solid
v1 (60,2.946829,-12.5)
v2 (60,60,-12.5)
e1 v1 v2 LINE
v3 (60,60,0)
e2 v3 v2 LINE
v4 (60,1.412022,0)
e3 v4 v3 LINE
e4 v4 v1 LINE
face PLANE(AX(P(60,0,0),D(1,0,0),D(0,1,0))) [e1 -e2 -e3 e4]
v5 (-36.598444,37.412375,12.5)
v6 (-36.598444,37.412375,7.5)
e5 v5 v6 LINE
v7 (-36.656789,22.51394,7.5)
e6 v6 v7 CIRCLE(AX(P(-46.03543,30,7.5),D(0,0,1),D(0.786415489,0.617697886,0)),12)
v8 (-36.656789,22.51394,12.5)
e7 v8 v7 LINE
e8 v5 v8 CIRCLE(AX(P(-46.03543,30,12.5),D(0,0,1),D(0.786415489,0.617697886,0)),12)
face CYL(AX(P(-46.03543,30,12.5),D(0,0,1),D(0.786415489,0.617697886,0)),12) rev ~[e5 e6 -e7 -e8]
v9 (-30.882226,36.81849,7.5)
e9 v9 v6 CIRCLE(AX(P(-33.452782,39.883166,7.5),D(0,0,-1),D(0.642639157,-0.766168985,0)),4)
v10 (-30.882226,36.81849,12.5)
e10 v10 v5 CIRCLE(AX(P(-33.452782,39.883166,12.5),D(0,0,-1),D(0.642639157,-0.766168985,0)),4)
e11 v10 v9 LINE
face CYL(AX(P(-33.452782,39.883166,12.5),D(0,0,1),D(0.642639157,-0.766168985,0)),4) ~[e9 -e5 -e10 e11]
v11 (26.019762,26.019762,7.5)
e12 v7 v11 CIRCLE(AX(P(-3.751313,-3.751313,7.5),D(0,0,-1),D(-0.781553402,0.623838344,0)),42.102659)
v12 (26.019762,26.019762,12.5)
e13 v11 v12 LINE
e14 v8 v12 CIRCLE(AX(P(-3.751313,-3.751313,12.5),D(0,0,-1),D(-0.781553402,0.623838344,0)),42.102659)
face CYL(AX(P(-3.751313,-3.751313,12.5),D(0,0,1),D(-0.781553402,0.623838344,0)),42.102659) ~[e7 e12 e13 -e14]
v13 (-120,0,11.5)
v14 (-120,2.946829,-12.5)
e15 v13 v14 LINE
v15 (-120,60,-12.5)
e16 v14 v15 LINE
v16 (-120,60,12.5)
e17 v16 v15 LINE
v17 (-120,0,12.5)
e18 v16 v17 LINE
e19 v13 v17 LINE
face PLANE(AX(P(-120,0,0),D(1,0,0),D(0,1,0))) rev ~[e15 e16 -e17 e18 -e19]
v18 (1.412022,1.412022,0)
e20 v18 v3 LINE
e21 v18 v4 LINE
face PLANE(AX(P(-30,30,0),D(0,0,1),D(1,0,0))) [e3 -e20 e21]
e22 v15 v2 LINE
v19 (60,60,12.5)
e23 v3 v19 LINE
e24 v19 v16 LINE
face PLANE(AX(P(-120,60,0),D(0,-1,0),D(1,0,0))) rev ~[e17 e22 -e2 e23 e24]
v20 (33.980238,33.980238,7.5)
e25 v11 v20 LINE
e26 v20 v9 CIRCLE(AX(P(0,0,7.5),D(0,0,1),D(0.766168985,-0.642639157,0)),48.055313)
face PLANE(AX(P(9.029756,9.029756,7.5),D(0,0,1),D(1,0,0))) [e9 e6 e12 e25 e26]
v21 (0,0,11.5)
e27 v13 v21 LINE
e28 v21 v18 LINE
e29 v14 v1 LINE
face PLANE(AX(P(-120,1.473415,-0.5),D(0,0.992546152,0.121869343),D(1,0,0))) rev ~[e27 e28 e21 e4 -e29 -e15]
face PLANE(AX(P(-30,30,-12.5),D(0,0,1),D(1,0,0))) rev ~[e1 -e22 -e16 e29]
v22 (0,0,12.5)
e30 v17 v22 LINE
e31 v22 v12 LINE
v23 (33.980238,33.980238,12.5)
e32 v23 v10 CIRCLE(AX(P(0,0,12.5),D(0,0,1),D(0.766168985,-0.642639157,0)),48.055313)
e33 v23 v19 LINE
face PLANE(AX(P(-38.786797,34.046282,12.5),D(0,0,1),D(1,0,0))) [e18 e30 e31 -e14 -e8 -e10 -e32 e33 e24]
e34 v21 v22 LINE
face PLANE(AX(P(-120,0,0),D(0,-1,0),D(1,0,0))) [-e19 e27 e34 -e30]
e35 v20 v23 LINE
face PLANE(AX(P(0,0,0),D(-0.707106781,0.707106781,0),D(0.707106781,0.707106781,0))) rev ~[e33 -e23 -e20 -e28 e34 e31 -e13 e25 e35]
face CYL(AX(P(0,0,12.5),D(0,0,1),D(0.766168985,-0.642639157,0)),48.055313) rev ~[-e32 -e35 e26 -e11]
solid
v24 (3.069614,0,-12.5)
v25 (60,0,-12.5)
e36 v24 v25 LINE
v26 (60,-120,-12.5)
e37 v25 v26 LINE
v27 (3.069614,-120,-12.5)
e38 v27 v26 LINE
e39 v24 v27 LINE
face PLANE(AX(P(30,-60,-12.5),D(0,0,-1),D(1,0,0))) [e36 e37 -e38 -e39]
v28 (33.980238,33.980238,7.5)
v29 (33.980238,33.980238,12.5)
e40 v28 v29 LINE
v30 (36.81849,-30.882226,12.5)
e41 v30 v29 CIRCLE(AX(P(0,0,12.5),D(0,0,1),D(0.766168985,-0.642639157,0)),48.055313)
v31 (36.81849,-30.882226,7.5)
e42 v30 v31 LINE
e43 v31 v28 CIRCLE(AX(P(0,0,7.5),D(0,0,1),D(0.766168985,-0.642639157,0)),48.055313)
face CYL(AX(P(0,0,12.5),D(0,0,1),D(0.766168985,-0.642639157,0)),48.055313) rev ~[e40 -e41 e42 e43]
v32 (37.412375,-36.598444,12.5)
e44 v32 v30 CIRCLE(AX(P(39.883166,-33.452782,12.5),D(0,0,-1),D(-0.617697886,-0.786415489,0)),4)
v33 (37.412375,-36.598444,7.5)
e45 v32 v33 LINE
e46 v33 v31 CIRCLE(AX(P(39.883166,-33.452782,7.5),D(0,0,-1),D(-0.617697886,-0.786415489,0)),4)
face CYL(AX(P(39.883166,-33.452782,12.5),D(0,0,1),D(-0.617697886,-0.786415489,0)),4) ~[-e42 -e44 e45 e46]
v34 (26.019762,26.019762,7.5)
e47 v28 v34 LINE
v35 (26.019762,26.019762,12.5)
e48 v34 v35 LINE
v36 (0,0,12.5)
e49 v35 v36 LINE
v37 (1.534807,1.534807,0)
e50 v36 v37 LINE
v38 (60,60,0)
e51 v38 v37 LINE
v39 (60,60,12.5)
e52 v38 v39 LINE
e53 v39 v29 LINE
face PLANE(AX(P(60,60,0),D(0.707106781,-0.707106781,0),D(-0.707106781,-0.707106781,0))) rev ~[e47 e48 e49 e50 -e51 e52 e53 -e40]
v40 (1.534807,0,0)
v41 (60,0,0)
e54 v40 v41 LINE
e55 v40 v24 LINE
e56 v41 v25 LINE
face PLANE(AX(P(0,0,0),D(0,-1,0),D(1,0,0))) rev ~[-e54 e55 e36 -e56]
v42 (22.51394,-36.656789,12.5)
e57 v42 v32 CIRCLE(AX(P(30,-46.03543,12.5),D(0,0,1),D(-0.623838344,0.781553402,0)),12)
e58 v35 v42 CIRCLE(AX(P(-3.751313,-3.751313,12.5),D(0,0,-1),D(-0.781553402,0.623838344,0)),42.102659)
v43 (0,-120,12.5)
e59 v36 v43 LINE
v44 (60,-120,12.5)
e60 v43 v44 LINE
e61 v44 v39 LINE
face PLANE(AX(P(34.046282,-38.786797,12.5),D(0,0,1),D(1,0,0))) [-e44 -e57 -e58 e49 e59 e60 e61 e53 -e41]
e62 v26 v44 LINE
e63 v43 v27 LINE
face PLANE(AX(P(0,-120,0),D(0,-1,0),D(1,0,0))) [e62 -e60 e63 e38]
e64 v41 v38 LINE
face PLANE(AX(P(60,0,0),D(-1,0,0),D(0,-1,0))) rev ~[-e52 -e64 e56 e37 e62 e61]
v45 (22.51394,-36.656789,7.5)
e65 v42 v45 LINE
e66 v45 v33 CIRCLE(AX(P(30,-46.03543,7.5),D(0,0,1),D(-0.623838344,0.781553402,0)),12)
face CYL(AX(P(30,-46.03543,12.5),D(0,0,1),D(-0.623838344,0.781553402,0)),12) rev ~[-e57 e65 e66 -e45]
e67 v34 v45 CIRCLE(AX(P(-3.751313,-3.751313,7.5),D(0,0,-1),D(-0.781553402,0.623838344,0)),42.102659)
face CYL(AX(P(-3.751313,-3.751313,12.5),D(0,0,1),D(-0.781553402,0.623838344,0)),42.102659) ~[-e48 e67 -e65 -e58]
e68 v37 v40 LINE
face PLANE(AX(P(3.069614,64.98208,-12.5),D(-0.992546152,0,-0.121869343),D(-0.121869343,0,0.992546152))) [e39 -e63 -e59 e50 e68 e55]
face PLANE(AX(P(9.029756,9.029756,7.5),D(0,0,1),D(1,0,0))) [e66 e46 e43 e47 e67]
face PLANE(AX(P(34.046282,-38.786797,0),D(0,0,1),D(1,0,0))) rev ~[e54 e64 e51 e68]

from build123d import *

# Parameters (mm, degrees)
F2_DEPTH     = 12.5
F3_W         = 180
F3_H         = 60
F4_DEPTH     = 12.5
F5_SIZE2     = 2.9468294617
F5_SIZE      = 24
F7_DEPTH     = 12.5
F8_W         = 60
F8_H         = 120
F9_DEPTH     = 12.5
F10_T1_DEPTH = 249.96415925
F13_DEPTH    = 5


# Not quite as in the source:
# - a fillet or chamfer that OpenCascade refuses, or shapes differently, is made with other operations: its cross-section is extruded or revolved along the edge and cut away or added


with BuildPart() as f2:
    # F1 (on Top) → F2 (new body)
    with BuildSketch(Plane.XY):
        Polygon((-120, 0), (0, 0), (12.6794919243, 12.6794919243), (47.3205080757, 47.3205080757), (60, 60), (-120, 60), align=None)
    extrude(amount=F2_DEPTH)

    # F3 (on Top) → F4 (join)
    with BuildSketch(Plane.XY):
        with Locations((-30, 30)):
            Rectangle(F3_W, F3_H)
    extrude(amount=-F4_DEPTH)

    # F5
    f5_edges = [f2.edges().sort_by_distance(p)[0] for p in [
        (-30, 0, -12.5),
    ]]
    f5_side = f2.faces().sort_by_distance((-42, 0, -1.25))[0]
    chamfer(f5_edges, length=F5_SIZE, length2=F5_SIZE2, reference=f5_side)


with BuildPart() as f7:
    # F6 (on Top) → F7 (new body)
    with BuildSketch(Plane.XY):
        Polygon((60, -120), (60, 60), (47.3205080757, 47.3205080757), (12.6794919243, 12.6794919243), (0, 0), (0, -120), align=None)
    extrude(amount=F7_DEPTH)

    # F8 (on face) → F9 (join)
    with BuildSketch(Plane(origin=(0, 0, 0), x_dir=(1, 0, 0), z_dir=(0, 0, -1))):
        with Locations((30, 60)):
            Rectangle(F8_W, F8_H)
    extrude(amount=F9_DEPTH)

    # F10: chamfer of 25 x 3.0696140226 on 1 edges, made by hand

    # F10_s2 → F10_t1 (cut)
    with BuildSketch(Plane.XZ.offset(-64.982079625)):
        Polygon((3.0696140226, -12.5), (0, 12.5), (0, -12.5), align=None)
    extrude(amount=F10_T1_DEPTH, mode=Mode.SUBTRACT)


with BuildPart() as f13_tool:
    # F12 (on plane+point) → F13 (new body)
    with BuildSketch(Plane.XY.offset(12.5)):
        with BuildLine():
            ThreePointArc((37.4123746331, -36.5984442616), (35.9045811532, -33.8661359121), (36.8184902357, -30.8822256783))
            ThreePointArc((36.8184902357, -30.8822256783), (33.9802375365, 33.9802375365), (-30.8822256783, 36.8184902357))
            ThreePointArc((-30.8822256783, 36.8184902357), (-33.8661359121, 35.9045811532), (-36.5984442616, 37.4123746331))
            ThreePointArc((-36.5984442616, 37.4123746331), (-58.0353381129, 30.0469938735), (-36.6567893055, 22.5139398702))
            ThreePointArc((-36.6567893055, 22.5139398702), (26.0197624635, 26.0197624635), (22.5139398702, -36.6567893055))
            ThreePointArc((22.5139398702, -36.6567893055), (30.0469938735, -58.0353381129), (37.4123746331, -36.5984442616))
        make_face()
    extrude(amount=-F13_DEPTH)


with BuildPart() as f2_1:
    add(f2.part)

    # F13: cut by f13_tool
    add(f13_tool.part, mode=Mode.SUBTRACT)


with BuildPart() as f7_1:
    add(f7.part)

    # F13: cut by f13_tool
    add(f13_tool.part, mode=Mode.SUBTRACT)


solid = Compound([f2_1.part, f7_1.part])
